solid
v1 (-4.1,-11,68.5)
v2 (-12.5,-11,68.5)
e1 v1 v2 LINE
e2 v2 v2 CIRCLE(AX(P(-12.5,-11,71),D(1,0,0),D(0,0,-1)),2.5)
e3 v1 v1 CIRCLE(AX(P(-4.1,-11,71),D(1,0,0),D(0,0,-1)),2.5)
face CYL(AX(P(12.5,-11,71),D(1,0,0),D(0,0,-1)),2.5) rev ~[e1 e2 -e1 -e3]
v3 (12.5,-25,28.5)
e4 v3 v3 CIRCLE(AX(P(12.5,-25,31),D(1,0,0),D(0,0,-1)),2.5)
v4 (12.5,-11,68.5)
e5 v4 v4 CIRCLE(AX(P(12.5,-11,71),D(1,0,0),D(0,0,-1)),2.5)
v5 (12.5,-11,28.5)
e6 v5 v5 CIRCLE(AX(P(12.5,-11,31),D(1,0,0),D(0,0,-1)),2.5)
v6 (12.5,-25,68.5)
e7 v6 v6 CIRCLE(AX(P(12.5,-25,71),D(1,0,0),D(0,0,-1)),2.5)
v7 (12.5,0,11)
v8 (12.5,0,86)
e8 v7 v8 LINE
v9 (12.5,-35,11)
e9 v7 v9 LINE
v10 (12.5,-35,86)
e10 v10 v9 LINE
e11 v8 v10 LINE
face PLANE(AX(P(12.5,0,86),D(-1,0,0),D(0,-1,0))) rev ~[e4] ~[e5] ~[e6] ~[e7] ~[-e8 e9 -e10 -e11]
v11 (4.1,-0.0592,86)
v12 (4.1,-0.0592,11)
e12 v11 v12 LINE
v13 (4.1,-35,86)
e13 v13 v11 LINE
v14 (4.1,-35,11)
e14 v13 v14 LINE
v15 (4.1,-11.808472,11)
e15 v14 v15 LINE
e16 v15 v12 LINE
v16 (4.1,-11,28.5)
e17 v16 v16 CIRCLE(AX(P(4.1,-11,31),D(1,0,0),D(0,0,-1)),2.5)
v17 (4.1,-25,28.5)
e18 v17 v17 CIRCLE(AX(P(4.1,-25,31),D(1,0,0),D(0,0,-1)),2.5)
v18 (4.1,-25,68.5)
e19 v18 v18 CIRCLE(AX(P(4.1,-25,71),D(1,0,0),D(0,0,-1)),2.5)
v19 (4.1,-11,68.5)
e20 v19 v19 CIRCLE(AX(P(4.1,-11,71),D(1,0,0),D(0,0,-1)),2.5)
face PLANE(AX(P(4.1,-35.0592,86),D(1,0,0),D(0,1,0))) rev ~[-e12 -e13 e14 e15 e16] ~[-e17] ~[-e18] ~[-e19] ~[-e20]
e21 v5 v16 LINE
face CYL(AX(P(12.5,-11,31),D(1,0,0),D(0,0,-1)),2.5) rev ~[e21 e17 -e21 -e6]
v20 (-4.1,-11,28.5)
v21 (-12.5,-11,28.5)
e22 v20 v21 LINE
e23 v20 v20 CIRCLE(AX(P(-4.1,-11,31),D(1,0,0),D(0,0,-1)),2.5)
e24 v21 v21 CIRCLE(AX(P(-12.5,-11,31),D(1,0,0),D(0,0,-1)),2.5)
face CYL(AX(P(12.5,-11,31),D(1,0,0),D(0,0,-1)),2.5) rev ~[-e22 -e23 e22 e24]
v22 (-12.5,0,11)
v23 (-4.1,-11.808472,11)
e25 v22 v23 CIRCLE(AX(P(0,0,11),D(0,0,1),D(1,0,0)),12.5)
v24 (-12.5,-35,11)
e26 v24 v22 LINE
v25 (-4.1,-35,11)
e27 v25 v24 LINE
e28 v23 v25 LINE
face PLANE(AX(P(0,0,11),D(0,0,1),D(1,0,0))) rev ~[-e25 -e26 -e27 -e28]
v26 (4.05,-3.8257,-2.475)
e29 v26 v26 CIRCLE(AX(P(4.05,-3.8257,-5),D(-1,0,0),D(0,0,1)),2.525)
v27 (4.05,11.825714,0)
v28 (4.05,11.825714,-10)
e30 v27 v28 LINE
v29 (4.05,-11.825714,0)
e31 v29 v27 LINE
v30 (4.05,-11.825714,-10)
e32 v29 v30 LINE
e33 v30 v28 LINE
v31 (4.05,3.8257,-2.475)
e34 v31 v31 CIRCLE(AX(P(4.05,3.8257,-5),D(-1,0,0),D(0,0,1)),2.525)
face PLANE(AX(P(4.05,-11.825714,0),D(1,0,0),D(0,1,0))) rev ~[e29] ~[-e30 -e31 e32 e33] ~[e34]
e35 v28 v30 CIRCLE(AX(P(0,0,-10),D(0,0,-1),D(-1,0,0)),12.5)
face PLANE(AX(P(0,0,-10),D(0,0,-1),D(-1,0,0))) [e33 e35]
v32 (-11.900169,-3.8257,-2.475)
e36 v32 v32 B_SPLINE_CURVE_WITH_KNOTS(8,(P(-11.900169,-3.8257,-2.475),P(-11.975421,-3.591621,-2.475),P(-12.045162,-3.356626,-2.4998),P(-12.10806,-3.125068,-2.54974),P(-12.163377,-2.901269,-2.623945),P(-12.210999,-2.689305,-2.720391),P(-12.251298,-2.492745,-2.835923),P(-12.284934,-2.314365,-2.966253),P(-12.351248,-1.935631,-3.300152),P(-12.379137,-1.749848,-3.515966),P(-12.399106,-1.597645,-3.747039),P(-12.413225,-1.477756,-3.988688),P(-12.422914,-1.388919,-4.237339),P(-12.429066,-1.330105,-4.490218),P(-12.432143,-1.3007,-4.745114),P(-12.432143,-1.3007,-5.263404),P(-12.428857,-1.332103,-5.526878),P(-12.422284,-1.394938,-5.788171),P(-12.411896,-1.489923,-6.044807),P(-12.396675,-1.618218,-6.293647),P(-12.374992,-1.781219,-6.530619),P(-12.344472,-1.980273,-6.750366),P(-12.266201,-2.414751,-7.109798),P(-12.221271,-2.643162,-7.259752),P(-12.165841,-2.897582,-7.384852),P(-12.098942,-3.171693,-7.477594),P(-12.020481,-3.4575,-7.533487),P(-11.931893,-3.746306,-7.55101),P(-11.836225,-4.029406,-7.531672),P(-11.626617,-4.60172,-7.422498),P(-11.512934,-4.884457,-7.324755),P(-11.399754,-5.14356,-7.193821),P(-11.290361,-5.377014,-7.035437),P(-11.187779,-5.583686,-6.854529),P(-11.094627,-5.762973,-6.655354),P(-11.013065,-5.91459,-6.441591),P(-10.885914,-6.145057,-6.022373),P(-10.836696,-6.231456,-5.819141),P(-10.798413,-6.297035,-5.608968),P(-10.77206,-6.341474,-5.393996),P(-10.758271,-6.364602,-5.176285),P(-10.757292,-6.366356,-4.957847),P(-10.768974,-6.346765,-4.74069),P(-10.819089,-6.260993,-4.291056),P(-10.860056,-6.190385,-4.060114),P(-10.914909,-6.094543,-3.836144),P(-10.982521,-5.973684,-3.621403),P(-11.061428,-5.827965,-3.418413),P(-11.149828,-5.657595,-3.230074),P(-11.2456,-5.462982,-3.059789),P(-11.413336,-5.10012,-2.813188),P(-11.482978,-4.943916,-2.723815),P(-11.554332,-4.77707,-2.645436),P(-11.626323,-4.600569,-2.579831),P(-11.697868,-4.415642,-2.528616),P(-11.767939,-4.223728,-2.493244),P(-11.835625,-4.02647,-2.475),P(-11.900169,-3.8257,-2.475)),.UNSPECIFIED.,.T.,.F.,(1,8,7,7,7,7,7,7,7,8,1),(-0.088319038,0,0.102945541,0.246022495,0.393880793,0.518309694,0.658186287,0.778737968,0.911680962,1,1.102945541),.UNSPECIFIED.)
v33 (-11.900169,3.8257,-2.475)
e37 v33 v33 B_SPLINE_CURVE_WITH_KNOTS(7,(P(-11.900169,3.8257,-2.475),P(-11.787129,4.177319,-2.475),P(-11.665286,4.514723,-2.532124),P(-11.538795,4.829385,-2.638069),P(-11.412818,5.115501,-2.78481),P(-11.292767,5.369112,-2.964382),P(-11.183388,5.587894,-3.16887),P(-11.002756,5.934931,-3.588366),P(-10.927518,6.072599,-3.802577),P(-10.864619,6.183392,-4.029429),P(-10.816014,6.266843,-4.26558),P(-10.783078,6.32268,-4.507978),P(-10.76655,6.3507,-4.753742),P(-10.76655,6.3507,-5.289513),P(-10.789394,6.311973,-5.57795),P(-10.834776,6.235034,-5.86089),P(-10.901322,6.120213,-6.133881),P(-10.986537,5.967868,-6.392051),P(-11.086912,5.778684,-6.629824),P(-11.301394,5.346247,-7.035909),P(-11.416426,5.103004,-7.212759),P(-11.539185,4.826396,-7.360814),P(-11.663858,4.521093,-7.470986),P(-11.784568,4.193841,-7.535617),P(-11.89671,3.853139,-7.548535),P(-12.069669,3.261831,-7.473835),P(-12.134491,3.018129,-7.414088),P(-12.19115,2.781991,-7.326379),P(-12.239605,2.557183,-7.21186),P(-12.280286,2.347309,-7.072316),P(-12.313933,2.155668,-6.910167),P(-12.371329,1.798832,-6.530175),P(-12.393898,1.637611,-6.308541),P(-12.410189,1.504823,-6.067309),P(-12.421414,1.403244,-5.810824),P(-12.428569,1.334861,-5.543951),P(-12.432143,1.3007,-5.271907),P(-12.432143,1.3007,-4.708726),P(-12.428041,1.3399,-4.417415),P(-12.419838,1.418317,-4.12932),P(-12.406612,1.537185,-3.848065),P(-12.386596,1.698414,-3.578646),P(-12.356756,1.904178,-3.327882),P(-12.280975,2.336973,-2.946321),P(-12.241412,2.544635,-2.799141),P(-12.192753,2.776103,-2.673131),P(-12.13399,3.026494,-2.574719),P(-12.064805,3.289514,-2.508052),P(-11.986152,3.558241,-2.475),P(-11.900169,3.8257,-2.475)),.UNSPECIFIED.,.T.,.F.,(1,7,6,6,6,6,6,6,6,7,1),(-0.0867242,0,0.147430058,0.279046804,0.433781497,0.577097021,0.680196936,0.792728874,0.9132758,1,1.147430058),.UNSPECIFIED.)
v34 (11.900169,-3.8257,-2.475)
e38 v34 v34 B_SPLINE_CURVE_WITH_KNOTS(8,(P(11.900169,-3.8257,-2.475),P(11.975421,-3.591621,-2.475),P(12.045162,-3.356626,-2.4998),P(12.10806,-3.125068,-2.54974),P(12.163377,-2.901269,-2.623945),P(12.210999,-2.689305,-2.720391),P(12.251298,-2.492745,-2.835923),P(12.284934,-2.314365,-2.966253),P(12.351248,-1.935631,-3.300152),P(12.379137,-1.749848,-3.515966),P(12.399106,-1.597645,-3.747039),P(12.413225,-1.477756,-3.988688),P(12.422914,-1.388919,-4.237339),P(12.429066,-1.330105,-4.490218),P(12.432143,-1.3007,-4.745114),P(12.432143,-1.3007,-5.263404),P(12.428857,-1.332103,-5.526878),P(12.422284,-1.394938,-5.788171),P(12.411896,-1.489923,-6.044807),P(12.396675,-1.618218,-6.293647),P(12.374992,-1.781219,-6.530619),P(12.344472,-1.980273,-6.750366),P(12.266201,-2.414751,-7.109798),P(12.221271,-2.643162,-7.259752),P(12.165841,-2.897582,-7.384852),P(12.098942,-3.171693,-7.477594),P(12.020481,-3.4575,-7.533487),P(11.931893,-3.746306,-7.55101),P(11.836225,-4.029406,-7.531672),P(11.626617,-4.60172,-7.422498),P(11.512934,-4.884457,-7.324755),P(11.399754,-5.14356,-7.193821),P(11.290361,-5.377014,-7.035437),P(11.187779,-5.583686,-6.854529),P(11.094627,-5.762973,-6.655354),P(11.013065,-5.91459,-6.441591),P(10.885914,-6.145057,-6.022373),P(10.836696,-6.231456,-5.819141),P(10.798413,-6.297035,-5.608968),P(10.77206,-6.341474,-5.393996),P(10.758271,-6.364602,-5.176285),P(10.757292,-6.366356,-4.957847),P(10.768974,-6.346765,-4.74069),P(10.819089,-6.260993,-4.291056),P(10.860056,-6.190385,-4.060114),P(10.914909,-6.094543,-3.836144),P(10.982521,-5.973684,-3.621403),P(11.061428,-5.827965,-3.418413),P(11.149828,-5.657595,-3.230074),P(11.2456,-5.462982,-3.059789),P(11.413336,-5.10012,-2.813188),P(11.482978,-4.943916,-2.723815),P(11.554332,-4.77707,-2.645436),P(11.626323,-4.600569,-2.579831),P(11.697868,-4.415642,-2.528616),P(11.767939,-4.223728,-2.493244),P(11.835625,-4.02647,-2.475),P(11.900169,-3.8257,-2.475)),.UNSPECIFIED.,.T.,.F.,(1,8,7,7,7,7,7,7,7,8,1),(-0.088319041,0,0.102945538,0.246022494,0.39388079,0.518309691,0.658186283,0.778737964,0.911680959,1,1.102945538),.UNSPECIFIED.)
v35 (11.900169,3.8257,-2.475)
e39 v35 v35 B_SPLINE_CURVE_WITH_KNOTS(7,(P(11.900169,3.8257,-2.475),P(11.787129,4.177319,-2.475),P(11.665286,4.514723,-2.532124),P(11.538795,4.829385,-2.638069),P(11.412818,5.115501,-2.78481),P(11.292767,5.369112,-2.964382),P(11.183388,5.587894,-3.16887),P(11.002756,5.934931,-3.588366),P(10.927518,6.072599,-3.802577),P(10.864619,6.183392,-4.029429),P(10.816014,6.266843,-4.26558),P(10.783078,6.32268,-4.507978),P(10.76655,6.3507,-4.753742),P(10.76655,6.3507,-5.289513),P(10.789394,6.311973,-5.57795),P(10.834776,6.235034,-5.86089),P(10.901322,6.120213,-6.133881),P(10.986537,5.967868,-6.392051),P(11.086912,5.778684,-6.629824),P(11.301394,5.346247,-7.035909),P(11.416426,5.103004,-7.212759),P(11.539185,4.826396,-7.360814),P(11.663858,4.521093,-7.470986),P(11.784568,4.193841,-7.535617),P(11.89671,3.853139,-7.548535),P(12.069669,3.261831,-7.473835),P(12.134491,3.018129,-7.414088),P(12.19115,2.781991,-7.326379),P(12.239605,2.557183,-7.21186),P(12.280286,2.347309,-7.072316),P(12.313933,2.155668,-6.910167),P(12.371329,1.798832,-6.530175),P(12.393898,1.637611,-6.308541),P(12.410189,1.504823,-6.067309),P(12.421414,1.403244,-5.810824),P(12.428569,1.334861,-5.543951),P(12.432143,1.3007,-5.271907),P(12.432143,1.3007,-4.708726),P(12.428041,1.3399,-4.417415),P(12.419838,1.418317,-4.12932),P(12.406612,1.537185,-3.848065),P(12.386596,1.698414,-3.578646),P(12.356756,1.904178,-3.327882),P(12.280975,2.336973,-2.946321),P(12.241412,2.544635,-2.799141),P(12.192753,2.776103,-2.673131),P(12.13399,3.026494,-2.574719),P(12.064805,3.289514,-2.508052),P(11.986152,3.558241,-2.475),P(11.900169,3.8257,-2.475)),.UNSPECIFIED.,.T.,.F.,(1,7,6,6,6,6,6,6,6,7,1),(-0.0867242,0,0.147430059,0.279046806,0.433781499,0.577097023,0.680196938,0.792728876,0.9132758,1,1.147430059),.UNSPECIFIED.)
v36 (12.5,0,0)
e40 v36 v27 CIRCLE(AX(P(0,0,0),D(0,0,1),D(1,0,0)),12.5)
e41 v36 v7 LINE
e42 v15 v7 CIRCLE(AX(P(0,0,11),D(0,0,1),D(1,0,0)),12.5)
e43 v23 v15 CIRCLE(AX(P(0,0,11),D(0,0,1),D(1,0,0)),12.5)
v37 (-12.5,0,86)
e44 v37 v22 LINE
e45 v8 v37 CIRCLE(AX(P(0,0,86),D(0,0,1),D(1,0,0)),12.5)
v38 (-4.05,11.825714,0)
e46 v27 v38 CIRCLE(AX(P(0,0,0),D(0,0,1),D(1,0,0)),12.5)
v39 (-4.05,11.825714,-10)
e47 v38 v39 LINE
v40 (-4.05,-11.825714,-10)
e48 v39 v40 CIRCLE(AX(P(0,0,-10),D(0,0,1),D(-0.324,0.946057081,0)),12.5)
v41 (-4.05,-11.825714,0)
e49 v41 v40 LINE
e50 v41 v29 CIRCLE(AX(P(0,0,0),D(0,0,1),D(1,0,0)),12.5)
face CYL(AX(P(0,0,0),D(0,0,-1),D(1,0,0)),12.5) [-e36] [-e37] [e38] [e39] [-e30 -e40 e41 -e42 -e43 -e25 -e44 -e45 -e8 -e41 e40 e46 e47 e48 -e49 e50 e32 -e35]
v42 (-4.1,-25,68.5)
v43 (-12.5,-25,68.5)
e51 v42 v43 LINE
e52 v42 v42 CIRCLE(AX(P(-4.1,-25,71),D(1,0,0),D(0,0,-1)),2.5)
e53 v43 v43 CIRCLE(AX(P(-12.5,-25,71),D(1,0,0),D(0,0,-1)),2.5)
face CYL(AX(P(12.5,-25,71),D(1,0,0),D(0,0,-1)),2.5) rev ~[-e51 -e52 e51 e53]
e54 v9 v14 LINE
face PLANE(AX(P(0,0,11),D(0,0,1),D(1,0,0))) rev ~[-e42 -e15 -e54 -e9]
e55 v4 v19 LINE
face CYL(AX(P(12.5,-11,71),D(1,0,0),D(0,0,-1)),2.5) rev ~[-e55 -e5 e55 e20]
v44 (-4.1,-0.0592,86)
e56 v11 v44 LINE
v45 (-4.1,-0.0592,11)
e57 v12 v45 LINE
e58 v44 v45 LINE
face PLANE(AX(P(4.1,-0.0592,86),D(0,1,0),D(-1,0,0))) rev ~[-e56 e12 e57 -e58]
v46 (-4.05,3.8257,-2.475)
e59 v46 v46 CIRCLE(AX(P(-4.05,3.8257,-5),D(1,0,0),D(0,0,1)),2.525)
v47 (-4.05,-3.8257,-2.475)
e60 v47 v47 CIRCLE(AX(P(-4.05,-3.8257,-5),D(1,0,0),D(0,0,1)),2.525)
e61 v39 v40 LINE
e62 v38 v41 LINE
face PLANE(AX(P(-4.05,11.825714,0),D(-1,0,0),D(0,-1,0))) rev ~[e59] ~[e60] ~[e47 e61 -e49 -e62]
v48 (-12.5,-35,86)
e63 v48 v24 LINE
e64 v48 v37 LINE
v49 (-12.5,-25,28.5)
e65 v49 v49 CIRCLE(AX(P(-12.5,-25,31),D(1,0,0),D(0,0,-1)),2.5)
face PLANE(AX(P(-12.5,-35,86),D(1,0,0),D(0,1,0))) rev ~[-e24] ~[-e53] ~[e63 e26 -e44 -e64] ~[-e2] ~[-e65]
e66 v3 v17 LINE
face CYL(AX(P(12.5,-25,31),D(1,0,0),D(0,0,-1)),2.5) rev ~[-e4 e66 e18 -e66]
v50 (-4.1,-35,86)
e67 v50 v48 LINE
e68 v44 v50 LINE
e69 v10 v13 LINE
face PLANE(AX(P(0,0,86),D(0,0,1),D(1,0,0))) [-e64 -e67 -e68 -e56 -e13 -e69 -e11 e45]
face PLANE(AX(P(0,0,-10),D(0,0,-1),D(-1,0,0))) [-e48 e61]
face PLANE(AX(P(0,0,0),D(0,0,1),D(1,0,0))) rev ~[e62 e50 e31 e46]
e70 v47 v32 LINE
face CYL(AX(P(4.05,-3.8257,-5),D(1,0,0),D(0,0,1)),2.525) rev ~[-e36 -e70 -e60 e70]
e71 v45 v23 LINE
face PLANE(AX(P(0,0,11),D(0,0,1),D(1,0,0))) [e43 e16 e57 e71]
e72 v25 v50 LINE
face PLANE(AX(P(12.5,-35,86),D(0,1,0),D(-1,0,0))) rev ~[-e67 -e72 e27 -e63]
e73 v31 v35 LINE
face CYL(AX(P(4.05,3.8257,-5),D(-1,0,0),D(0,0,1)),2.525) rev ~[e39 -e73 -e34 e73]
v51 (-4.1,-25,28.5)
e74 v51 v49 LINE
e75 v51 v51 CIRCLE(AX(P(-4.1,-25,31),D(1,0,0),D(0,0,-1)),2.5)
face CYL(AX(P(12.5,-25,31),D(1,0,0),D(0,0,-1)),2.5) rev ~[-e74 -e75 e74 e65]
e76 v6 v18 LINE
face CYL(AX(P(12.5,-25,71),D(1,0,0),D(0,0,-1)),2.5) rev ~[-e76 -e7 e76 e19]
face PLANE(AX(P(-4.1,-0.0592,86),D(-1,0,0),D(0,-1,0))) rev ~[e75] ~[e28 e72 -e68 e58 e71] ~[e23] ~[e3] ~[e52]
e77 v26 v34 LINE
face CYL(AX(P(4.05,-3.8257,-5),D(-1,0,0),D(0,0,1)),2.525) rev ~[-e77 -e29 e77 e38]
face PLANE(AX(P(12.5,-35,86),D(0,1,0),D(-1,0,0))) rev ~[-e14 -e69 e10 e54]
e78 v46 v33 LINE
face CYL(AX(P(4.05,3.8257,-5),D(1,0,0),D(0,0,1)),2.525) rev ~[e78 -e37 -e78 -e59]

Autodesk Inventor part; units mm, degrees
ref_plane "YZ Plane" through (0, 0, 0) normal (1, 0, 0) x (0, 1, 0)
ref_plane "XZ Plane" through (0, 0, 0) normal (0, 1, 0) x (-1, 0, 0)
ref_plane "XY Plane" through (0, 0, 0) normal (0, 0, 1) x (1, 0, 0)
sketch "Skizze1" plane through (0, 0, 0) normal (0, 0, 1) x (1, 0, 0)
  circle A0 centre (0, 0) radius 12.5
  dimension "d0" = 25
extrude "Extrusion1" add sketch "Skizze1" along normal blind 86
sketch "Skizze3" plane through (0, 0, 86) normal (0, 0, 1) x (1, 0, 0)
  circle A0 centre (0, 0) radius 12.5 projected
  line L0 (-12.5, 0) -> (12.5, 0)
  line L1 (12.5, 0) -> (12.5, -35)
  line L2 (12.5, -35) -> (-12.5, -35)
  line L3 (-12.5, -35) -> (-12.5, 0)
  dimension "d4" = 35
extrude "Extrusion2" add sketch "Skizze3" against normal blind 75 contours L1 L2 L3 A0
sketch "Skizze4" plane through (0, 0, 86) normal (0, 0, 1) x (1, 0, 0)
  line L0 (-4.1, -35.0592) -> (4.1, -35.0592)
  line L1 (4.1, -35.0592) -> (4.1, -0.0592)
  line L2 (4.1, -0.0592) -> (-4.1, -0.0592)
  line L3 (-4.1, -0.0592) -> (-4.1, -35.0592)
  line L4 (-12.5, 0) -> (-12.5, -35) projected
  line L5 (12.5, -35) -> (12.5, 0) projected
  point P0 (0, 0)
  dimension "d7" = 8.2
  dimension "d8" = 35
  dimension "d9" = 8.4
  dimension "d10" = 8.4
extrude "Extrusion3" cut sketch "Skizze4" against normal up to surface (75 mm away)
sketch "Skizze5" plane through (0, 0, 0) normal (0, 0, -1) x (-1, 0, 0)
  line L0 (-4.05, 11.8427) -> (4.05, 11.8427)
  line L1 (4.05, 11.8427) -> (4.05, -11.8427)
  line L2 (4.05, -11.8427) -> (-4.05, -11.8427)
  line L3 (-4.05, -11.8427) -> (-4.05, 11.8427)
  circle A0 centre (0, 0) radius 12.5
  point P0 (4.05, -11.8257)
  point P1 (4.05, 11.8257)
  point P2 (-4.05, 11.8257)
  point P3 (-4.05, -11.8257)
  dimension "d13" = 8.1
  dimension "d14" = 4.05
  dimension "d16" = 25
extrude "Extrusion4" add sketch "Skizze5" along normal blind 10 contours L3 A0 | A0 L1
sketch "Skizze6" plane through (4.05, -11.8257, 0) normal (-1, 0, 0) x (0, 0, 1)
  circle A0 centre (-5, 8) radius 2.525
  line L0 (-10, 23.6514) -> (-10, 0) projected
  circle A1 centre (-5, 15.6514) radius 2.525
  line L1 (0, 23.6514) -> (-10, 23.6514) projected
  line L2 (0, 0) -> (-10, 0) projected
  point P0 (0, 11.8257)
  dimension "d19" = 5.05
  dimension "d20" = 5
  dimension "d21" = 5.05
  dimension "d22" = 0
  dimension "d23" = 8
  dimension "d24" = 8
  dimension "d25" = 7.6514
extrude "Extrusion5" cut sketch "Skizze6" along normal mid plane 500
sketch "Skizze7" plane through (12.5, -35, 86) normal (1, 0, 0) x (0, 0, -1)
  circle A0 centre (55, 24) radius 2.5
  circle A1 centre (15, 24) radius 2.5
  circle A2 centre (15, 10) radius 2.5
  circle A3 centre (55, 10) radius 2.5
  line L0 (0, 0) -> (0, 35) projected
  line L1 (0, 0) -> (75, 0) projected
  line L2 (75, 35) -> (0, 35) projected
  point P0 (86, 35)
  dimension "d28" = 5
  dimension "d29" = 5
  dimension "d30" = 5
  dimension "d31" = 5
  dimension "d32" = 15
  dimension "d33" = 15
  dimension "d34" = 40
  dimension "d35" = 40
  dimension "d36" = 0
  dimension "d37" = 10
  dimension "d38" = 14
  dimension "d39" = 14
  dimension "d42" = 11
extrude "Extrusion6" cut sketch "Skizze7" against normal up to surface (25 mm away)
properties part number "Fahnenhalter"
